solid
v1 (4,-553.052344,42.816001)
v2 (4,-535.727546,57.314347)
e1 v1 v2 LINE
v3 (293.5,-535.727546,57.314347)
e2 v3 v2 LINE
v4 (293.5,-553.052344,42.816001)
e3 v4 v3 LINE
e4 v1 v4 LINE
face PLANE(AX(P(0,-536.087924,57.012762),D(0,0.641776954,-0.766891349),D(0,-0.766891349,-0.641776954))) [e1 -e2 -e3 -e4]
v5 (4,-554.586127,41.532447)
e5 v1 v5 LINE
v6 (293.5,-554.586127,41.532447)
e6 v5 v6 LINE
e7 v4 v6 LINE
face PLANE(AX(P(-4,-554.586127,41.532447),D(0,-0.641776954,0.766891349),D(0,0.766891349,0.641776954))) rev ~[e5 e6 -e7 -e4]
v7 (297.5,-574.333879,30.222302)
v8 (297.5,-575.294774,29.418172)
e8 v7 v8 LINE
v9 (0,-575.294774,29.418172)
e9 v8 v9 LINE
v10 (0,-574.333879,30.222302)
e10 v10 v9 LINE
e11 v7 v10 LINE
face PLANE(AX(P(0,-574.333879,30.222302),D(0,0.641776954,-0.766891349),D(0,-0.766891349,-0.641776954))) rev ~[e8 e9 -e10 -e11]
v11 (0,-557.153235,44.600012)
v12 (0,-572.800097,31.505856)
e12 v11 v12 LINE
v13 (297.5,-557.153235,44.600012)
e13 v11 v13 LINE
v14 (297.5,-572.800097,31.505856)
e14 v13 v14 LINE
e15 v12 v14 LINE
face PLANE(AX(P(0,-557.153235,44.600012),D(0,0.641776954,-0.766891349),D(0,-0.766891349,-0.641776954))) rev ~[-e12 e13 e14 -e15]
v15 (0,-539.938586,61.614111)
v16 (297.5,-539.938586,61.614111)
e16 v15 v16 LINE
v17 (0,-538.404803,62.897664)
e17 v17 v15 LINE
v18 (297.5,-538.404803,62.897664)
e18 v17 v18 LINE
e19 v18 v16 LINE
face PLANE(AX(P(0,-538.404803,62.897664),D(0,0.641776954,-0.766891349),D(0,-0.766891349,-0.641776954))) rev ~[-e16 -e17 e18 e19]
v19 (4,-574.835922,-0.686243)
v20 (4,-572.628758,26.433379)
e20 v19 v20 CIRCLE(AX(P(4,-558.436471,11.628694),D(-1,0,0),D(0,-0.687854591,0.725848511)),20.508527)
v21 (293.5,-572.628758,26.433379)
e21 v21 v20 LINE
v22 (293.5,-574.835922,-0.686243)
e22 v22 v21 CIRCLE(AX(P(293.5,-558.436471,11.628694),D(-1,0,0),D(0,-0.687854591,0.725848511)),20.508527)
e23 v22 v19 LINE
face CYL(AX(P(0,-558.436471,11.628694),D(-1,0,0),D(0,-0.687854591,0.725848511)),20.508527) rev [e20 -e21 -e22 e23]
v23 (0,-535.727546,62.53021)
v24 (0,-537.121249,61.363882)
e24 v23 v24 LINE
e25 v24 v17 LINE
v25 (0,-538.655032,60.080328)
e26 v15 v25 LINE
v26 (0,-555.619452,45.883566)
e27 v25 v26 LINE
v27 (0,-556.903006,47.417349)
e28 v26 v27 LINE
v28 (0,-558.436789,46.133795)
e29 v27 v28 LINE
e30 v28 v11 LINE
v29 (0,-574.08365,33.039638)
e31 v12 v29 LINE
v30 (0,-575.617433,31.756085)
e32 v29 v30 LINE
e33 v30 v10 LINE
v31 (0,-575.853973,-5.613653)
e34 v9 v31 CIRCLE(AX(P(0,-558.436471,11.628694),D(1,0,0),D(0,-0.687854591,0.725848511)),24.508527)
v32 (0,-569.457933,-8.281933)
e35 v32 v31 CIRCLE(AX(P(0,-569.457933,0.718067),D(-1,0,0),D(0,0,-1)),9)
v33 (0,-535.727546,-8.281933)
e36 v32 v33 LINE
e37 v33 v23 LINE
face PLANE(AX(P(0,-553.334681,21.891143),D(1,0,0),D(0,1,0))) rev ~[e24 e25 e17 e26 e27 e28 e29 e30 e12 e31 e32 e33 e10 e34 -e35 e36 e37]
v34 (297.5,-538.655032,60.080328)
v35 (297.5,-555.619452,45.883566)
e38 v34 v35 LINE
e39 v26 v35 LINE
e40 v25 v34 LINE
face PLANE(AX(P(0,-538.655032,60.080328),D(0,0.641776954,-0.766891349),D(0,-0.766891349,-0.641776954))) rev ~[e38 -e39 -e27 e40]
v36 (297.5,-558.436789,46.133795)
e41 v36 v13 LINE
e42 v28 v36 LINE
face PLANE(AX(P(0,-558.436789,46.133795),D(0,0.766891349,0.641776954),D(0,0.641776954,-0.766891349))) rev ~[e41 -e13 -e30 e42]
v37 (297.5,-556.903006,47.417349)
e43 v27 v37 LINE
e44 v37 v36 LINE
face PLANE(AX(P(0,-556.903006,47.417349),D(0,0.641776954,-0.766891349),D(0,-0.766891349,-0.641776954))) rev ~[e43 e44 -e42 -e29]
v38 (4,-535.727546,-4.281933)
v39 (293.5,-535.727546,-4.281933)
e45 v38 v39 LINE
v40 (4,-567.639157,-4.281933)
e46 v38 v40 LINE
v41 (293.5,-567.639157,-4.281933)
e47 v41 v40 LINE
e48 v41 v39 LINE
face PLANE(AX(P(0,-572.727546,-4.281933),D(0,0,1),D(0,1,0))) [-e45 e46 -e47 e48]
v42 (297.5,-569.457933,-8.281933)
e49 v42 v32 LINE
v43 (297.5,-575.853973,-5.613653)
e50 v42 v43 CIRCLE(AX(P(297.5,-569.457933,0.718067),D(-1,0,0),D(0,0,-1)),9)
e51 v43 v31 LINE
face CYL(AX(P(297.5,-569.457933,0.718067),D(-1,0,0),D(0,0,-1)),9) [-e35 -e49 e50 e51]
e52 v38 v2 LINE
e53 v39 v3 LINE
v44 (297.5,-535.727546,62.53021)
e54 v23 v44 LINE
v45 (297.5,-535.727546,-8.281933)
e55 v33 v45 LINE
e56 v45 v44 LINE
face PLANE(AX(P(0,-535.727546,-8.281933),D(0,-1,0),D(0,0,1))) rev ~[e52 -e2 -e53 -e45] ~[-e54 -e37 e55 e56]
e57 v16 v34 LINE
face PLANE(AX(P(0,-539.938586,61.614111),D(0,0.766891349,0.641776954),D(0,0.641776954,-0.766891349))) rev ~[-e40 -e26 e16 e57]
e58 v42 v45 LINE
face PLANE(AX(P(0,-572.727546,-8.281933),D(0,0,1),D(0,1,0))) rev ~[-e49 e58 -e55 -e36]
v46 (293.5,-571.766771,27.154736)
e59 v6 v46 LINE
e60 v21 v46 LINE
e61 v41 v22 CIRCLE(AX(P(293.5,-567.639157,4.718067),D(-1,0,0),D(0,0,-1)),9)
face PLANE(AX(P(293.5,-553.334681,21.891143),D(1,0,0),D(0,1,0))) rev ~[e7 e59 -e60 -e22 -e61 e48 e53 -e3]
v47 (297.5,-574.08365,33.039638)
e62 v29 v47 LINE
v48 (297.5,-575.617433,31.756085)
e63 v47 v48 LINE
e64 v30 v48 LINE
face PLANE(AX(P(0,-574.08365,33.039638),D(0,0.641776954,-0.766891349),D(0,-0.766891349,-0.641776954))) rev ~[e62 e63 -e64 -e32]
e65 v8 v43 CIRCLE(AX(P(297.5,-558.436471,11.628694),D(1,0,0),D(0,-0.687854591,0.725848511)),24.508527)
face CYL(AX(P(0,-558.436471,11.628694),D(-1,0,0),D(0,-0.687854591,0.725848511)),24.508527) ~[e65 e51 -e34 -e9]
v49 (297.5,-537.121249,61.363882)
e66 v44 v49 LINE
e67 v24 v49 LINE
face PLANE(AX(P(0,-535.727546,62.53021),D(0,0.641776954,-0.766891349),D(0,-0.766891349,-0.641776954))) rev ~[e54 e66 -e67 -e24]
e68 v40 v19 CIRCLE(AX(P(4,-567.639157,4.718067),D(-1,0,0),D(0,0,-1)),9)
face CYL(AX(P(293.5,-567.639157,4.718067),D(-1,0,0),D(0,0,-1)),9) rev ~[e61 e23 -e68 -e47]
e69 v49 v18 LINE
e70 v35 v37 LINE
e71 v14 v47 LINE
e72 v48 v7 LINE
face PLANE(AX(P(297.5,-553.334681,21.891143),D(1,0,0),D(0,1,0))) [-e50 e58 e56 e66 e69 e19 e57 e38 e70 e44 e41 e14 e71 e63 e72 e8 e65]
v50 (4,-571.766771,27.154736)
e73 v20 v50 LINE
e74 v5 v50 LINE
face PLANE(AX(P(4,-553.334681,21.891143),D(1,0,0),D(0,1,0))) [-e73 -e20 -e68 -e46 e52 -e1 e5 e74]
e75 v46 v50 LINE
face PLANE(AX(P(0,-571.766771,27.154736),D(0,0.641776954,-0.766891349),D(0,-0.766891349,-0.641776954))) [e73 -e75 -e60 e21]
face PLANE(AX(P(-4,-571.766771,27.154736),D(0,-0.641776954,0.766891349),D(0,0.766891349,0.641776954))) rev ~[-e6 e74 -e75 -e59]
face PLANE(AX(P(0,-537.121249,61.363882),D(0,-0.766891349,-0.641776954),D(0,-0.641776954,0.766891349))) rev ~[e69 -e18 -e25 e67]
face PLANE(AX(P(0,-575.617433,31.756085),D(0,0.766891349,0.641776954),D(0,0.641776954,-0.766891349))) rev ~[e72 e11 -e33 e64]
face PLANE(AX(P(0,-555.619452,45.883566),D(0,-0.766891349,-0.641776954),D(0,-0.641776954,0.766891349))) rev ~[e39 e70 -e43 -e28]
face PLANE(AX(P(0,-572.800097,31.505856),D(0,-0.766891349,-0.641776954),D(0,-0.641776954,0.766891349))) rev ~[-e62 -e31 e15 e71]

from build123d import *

# Parameters (mm, degrees)
F1_DEPTH    = 55.5
F2_DEPTH    = 297.5
F3_T        = 4
F3_T3_DEPTH = 305.5
F4_R        = 9
F5_R        = 9


# Not quite as in the source:
# - a shell that OpenCascade refuses in one call is made with other operations: the cavity is built on its own and cut out
# - a feature names something its author has since deleted; it is built from what else it names


with BuildPart() as f1:
    # F0 (on Right) → F1 (new body)
    with BuildSketch(Plane.YZ):
        with BuildLine():
            Line((-572.7275457045, -8.2819332473), (-535.7275457045, -8.2819332473))
            Line((-535.7275457045, -8.2819332473), (-535.7275457045, 62.5302098664))
            Line((-535.7275457045, 62.5302098664), (-537.1212494235, 61.363881769))
            Line((-537.1212494235, 61.363881769), (-538.6550321213, 60.0803278606))
            Line((-538.6550321213, 60.0803278606), (-555.619452014, 45.8835661626))
            Line((-555.619452014, 45.8835661626), (-557.1532347119, 44.6000122542))
            Line((-557.1532347119, 44.6000122542), (-572.8000965488, 31.5058557652))
            Line((-572.8000965488, 31.5058557652), (-574.3338792466, 30.2223018568))
            Line((-574.3338792466, 30.2223018568), (-575.2947741996, 29.4181719927))
            ThreePointArc((-575.2947741996, 29.4181719927), (-582.8883712939, 9.9636162879), (-572.7275457045, -8.2819332473))
        make_face()
        Polygon((-538.6550321213, 60.0803278606), (-537.1212494235, 61.363881769), (-538.404803332, 62.8976644668), (-539.9385860298, 61.6141105584), align=None)
        Polygon((-575.6174331551, 31.7560845546), (-574.3338792466, 30.2223018568), (-572.8000965488, 31.5058557652), (-574.0836504573, 33.0396384631), align=None)
        Polygon((-557.1532347119, 44.6000122542), (-555.619452014, 45.8835661626), (-556.9030059225, 47.4173488605), (-558.4367886203, 46.133794952), align=None)
    extrude(amount=F1_DEPTH)

    # F0 (on Right) → F2 (join)
    with BuildSketch(Plane.YZ):
        with BuildLine():
            Line((-572.7275457045, -8.2819332473), (-535.7275457045, -8.2819332473))
            Line((-535.7275457045, -8.2819332473), (-535.7275457045, 62.5302098664))
            Line((-535.7275457045, 62.5302098664), (-537.1212494235, 61.363881769))
            Line((-537.1212494235, 61.363881769), (-538.6550321213, 60.0803278606))
            Line((-538.6550321213, 60.0803278606), (-555.619452014, 45.8835661626))
            Line((-555.619452014, 45.8835661626), (-557.1532347119, 44.6000122542))
            Line((-557.1532347119, 44.6000122542), (-572.8000965488, 31.5058557652))
            Line((-572.8000965488, 31.5058557652), (-574.3338792466, 30.2223018568))
            Line((-574.3338792466, 30.2223018568), (-575.2947741996, 29.4181719927))
            ThreePointArc((-575.2947741996, 29.4181719927), (-582.8883712939, 9.9636162879), (-572.7275457045, -8.2819332473))
        make_face()
        Polygon((-538.6550321213, 60.0803278606), (-537.1212494235, 61.363881769), (-538.404803332, 62.8976644668), (-539.9385860298, 61.6141105584), align=None)
        Polygon((-575.6174331551, 31.7560845546), (-574.3338792466, 30.2223018568), (-572.8000965488, 31.5058557652), (-574.0836504573, 33.0396384631), align=None)
        Polygon((-557.1532347119, 44.6000122542), (-555.619452014, 45.8835661626), (-556.9030059225, 47.4173488605), (-558.4367886203, 46.133794952), align=None)
    extrude(amount=F2_DEPTH)

    # F3: shell of thickness 4, made by hand


with BuildPart() as f3_core1:
    # F3_t2: copy of F1
    add(f1.part)

    # the walls: a layer under each face that stays
    f3_faces = [f3_core1.faces().sort_by_distance(p)[0] for p in [
        (148.75, -582.8883712939, 9.9636162879),
        (0, -559.3362720247, 27.3078656098),
        (148.75, -574.9756562009, 30.9891932057),
        (148.75, -574.8505418062, 32.3978615088),
        (148.75, -573.441873503, 32.2727471141),
        (148.75, -564.9766656303, 38.0529340097),
        (148.75, -557.7950116661, 45.3669036031),
        (148.75, -557.6698972714, 46.7755719063),
        (148.75, -556.2612289683, 46.6504575116),
        (148.75, -547.1372420677, 52.9819470116),
        (148.75, -539.2968090756, 60.8472192095),
        (148.75, -539.1716946809, 62.2558875126),
        (148.75, -537.7630263777, 62.1307731179),
        (148.75, -536.424397564, 61.9470458177),
        (148.75, -554.2275457045, -8.2819332473),
        (297.5, -559.3362720247, 27.3078656098),
        (148.75, -574.8143267231, 29.8202369247),
    ]]
    thicken(f3_faces, amount=-F3_T, mode=Mode.SUBTRACT)

    # F3_s4 → F3_t3 (cut)
    with BuildSketch(Plane.YZ.offset(-4)):
        Polygon((-574.3902259788, 30.2273064326), (-571.266313851, 32.7894096737), (-568.6992060341, 29.721844278), (-571.7667714298, 27.1547364611), align=None)
        Polygon((-572.795091973, 31.5622024973), (-575.8676619445, 28.9387479484), (-573.3005541276, 25.8711825527), (-570.232988732, 28.4382903696), align=None)
        Polygon((-557.209581444, 44.60501683), (-554.586126895, 41.5324468586), (-551.5185614994, 44.0995546754), (-554.0856693162, 47.1671200711), align=None)
        Polygon((-555.6144474383, 45.9399128948), (-558.6870174097, 43.3164583458), (-556.1199095928, 40.2488929501), (-553.0523441972, 42.816000767), align=None)
        Polygon((-538.7113788535, 60.0853324364), (-536.0879243045, 57.0127624649), (-533.0203589088, 59.5798702818), (-535.5874667257, 62.6474356775), align=None)
        Polygon((-537.1162448477, 61.4202285011), (-540.1888148192, 58.7967739522), (-537.6217070023, 55.7292085565), (-534.5541416067, 58.2963163734), align=None)
    extrude(amount=F3_T3_DEPTH, mode=Mode.SUBTRACT)


with BuildPart() as f1_1:
    add(f1.part)

    # what is left inside the walls is the cavity
    f3_cavity = [f3_core1.part.solids().sort_by_distance(p)[0] for p in [
        (197, -535.767546, 26.516207),
    ]]
    add(f3_cavity, mode=Mode.SUBTRACT)

    # F4
    f4_edges = [f1_1.edges().sort_by_distance(p)[0] for p in [
        (148.75, -572.727546, -8.281933),
    ]]
    fillet(f4_edges, radius=F4_R)

    # F5
    f5_edges = [f1_1.edges().sort_by_distance(p)[0] for p in [
        (148.75, -571.376781, -4.281933),
    ]]
    fillet(f5_edges, radius=F5_R)


solid = f1_1.part
